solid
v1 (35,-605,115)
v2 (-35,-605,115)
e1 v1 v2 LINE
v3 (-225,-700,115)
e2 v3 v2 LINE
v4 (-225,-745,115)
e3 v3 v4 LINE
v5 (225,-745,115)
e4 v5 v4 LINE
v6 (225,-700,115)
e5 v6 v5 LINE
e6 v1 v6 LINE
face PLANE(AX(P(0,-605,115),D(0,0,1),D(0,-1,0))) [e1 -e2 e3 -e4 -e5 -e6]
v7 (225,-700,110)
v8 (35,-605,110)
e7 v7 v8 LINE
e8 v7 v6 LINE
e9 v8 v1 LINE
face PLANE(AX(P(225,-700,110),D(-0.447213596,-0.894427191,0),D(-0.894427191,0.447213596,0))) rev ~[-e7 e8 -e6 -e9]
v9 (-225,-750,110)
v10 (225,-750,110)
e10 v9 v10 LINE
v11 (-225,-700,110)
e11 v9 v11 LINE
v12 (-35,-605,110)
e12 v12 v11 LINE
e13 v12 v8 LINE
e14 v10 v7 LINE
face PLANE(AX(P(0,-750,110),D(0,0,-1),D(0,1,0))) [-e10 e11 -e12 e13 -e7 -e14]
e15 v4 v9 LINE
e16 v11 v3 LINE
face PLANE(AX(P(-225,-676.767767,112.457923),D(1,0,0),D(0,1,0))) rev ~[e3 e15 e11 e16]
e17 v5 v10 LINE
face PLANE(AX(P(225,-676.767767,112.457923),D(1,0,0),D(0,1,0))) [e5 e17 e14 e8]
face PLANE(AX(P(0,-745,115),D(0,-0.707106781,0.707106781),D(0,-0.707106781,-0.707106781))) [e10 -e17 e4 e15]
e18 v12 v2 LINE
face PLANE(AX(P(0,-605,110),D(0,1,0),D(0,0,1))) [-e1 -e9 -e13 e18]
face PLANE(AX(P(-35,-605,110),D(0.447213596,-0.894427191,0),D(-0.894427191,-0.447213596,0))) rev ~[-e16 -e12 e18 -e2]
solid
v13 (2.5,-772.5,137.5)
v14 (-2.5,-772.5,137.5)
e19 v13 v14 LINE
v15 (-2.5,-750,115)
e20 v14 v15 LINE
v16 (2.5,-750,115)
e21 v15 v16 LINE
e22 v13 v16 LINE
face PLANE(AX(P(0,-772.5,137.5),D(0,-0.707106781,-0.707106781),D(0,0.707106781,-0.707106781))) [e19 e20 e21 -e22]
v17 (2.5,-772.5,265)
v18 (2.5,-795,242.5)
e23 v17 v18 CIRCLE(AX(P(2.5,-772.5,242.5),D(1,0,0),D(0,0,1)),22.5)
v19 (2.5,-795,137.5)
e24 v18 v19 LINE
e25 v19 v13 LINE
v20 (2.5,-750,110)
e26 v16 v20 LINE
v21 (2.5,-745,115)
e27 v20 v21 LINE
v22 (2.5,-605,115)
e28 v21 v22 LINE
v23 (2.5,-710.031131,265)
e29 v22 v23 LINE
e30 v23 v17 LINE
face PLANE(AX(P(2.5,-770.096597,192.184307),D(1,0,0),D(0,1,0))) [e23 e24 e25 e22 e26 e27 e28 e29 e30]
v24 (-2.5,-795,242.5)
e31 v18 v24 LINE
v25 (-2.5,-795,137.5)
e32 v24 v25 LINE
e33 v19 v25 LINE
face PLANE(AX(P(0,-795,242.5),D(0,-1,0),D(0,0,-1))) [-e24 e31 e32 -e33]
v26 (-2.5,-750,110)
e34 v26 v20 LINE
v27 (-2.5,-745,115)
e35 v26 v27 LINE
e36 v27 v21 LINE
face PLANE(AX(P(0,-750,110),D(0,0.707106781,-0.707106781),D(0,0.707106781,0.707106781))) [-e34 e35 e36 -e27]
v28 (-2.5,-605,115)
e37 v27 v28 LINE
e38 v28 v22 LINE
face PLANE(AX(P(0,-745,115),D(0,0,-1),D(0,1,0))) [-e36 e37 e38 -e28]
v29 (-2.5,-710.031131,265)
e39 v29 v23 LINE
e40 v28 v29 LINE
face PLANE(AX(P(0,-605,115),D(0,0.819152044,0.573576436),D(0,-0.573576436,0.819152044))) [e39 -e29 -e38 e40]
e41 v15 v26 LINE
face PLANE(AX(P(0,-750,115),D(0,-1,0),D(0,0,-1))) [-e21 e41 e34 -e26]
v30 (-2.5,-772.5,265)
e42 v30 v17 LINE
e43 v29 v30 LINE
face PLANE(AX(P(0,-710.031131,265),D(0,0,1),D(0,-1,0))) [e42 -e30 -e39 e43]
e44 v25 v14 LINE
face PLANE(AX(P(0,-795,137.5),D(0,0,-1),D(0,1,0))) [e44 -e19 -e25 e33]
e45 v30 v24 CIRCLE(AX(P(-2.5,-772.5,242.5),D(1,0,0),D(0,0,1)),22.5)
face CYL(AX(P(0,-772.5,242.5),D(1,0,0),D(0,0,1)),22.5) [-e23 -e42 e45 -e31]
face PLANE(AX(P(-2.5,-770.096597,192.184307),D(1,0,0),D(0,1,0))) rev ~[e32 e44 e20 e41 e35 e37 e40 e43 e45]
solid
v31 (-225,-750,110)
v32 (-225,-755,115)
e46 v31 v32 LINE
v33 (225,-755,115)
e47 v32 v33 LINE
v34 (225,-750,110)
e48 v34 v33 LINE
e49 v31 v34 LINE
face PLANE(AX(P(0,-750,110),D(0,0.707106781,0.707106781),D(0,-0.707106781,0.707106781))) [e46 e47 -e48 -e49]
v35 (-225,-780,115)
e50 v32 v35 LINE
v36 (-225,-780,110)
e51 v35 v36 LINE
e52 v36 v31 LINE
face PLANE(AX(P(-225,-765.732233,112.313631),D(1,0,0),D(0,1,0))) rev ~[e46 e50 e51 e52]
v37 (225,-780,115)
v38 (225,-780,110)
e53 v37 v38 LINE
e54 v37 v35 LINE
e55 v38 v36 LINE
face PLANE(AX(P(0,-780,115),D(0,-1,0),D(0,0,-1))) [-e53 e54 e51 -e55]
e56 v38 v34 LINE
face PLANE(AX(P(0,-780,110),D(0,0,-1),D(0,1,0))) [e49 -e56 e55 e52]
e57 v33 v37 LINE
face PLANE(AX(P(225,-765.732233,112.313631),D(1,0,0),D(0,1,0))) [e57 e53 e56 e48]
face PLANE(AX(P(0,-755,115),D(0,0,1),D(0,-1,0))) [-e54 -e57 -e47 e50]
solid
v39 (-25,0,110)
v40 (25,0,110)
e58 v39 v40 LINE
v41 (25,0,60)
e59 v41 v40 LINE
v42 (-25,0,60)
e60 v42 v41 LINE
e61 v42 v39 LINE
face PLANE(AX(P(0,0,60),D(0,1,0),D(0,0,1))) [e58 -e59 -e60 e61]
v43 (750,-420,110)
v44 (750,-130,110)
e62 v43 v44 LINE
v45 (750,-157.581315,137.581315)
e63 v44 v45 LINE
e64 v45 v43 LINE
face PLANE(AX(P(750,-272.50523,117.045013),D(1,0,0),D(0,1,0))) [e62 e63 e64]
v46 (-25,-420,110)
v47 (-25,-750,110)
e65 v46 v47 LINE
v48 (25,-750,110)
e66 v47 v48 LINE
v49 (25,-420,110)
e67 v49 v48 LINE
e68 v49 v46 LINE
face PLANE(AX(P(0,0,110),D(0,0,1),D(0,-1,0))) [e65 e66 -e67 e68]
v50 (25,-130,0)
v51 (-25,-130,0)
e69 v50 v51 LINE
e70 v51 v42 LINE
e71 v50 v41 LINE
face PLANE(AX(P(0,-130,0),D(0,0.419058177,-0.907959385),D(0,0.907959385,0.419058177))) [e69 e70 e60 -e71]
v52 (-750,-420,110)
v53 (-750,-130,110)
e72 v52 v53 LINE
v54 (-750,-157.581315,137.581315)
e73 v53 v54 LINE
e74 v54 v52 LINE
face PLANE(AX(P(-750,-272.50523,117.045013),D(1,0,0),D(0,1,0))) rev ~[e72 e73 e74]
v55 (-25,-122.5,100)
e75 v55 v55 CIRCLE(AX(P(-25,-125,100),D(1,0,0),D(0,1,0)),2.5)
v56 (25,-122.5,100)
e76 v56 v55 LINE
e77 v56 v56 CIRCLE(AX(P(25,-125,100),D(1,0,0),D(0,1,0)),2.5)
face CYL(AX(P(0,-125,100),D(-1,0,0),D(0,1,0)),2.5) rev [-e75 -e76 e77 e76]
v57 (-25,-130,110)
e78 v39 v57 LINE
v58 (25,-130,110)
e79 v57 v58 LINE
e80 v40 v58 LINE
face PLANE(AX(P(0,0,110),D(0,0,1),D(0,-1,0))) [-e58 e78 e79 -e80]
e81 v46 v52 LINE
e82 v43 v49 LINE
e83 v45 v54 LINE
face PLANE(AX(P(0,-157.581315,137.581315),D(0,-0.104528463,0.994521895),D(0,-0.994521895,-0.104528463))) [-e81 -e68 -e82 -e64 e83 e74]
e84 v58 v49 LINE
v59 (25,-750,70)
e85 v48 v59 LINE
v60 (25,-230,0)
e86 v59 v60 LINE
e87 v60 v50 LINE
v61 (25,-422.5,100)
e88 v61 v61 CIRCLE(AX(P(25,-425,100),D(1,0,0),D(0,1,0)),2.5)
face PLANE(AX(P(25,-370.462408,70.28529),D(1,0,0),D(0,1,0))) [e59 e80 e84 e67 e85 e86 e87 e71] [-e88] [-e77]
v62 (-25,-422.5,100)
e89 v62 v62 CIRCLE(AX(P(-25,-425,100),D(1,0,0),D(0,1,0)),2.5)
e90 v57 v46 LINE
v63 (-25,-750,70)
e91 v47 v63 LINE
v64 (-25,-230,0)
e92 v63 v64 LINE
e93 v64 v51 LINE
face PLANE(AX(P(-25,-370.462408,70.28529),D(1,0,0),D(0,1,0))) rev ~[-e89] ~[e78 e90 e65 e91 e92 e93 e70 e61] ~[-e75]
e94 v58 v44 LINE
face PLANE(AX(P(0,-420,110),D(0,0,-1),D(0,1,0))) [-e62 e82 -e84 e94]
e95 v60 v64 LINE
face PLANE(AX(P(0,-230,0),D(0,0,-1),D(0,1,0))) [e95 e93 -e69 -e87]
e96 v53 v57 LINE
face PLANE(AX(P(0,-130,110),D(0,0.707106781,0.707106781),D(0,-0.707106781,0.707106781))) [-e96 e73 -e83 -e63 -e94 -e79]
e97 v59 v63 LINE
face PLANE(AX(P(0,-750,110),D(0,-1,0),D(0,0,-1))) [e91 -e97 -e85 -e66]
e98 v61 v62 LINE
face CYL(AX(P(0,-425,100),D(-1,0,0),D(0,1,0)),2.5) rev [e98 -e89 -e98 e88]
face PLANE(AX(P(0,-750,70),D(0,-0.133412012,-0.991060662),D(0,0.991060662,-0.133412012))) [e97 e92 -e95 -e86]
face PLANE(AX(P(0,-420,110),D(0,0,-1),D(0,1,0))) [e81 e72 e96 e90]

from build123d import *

# Parameters (mm, degrees)
F1_DEPTH = 2.5
F0_R     = 2.5
F2_DEPTH = 25
F3_DEPTH = 225
F5_DEPTH = 25
F6_DEPTH = 750


with BuildPart() as f1:
    # F0 (on Right) → F1 (new body, symmetric)
    with BuildSketch(Plane.YZ):
        with BuildLine():
            Line((-772.5, 137.5), (-750, 115))
            Line((-750, 115), (-750, 265))
            Line((-750, 265), (-772.5, 265))
            ThreePointArc((-772.5, 265), (-788.4099025767, 258.4099025767), (-795, 242.5))
            Line((-795, 242.5), (-795, 137.5))
            Line((-795, 137.5), (-772.5, 137.5))
        make_face()
        Polygon((-750, 115), (-750, 110), (-745, 115), (-605, 115), (-710.0311307315, 265), (-750, 265), align=None)
    extrude(amount=F1_DEPTH, both=True)


with BuildPart() as f2:
    # F0 (on Right) → F2 (new body, symmetric)
    with BuildSketch(Plane.YZ):
        Polygon((-180, 0), (-130, 0), (0, 60), (0, 110), (-130, 110), (-420, 110), (-605, 110), (-750, 110), (-750, 70), (-230, 0), align=None)
        with Locations((-425, 100)):
            Circle(F0_R, mode=Mode.SUBTRACT)
        with Locations((-125, 100)):
            Circle(F0_R, mode=Mode.SUBTRACT)
    extrude(amount=F2_DEPTH, both=True)

    # F0 (on Right) → F6 (join, symmetric)
    with BuildSketch(Plane.YZ):
        Polygon((-420, 110), (-130, 110), (-157.5813151867, 137.5813151867), align=None)
    extrude(amount=F6_DEPTH, both=True)


with BuildPart() as f3:
    # F0 (on Right) → F3 (new body, symmetric)
    with BuildSketch(Plane.YZ):
        Polygon((-780, 110), (-750, 110), (-755, 115), (-780, 115), align=None)
    extrude(amount=F3_DEPTH, both=True)


with BuildPart() as f3b:
    # F0 (on Right) → F3, piece 2 (new body, symmetric)
    with BuildSketch(Plane.YZ):
        Polygon((-745, 115), (-750, 110), (-605, 110), (-605, 115), align=None)
    extrude(amount=F3_DEPTH, both=True)

    # F4 (on face) → F5 (cut)
    with BuildSketch(Plane(origin=(0, 0, 110), x_dir=(1, 0, 0), z_dir=(0, 0, -1))):
        Polygon((225, 605), (225, 700), (35, 605), align=None)
        Polygon((-35, 605), (-225, 700), (-225, 605), align=None)
    extrude(amount=-F5_DEPTH, mode=Mode.SUBTRACT)


solid = Compound([f1.part, f2.part, f3.part, f3b.part])
